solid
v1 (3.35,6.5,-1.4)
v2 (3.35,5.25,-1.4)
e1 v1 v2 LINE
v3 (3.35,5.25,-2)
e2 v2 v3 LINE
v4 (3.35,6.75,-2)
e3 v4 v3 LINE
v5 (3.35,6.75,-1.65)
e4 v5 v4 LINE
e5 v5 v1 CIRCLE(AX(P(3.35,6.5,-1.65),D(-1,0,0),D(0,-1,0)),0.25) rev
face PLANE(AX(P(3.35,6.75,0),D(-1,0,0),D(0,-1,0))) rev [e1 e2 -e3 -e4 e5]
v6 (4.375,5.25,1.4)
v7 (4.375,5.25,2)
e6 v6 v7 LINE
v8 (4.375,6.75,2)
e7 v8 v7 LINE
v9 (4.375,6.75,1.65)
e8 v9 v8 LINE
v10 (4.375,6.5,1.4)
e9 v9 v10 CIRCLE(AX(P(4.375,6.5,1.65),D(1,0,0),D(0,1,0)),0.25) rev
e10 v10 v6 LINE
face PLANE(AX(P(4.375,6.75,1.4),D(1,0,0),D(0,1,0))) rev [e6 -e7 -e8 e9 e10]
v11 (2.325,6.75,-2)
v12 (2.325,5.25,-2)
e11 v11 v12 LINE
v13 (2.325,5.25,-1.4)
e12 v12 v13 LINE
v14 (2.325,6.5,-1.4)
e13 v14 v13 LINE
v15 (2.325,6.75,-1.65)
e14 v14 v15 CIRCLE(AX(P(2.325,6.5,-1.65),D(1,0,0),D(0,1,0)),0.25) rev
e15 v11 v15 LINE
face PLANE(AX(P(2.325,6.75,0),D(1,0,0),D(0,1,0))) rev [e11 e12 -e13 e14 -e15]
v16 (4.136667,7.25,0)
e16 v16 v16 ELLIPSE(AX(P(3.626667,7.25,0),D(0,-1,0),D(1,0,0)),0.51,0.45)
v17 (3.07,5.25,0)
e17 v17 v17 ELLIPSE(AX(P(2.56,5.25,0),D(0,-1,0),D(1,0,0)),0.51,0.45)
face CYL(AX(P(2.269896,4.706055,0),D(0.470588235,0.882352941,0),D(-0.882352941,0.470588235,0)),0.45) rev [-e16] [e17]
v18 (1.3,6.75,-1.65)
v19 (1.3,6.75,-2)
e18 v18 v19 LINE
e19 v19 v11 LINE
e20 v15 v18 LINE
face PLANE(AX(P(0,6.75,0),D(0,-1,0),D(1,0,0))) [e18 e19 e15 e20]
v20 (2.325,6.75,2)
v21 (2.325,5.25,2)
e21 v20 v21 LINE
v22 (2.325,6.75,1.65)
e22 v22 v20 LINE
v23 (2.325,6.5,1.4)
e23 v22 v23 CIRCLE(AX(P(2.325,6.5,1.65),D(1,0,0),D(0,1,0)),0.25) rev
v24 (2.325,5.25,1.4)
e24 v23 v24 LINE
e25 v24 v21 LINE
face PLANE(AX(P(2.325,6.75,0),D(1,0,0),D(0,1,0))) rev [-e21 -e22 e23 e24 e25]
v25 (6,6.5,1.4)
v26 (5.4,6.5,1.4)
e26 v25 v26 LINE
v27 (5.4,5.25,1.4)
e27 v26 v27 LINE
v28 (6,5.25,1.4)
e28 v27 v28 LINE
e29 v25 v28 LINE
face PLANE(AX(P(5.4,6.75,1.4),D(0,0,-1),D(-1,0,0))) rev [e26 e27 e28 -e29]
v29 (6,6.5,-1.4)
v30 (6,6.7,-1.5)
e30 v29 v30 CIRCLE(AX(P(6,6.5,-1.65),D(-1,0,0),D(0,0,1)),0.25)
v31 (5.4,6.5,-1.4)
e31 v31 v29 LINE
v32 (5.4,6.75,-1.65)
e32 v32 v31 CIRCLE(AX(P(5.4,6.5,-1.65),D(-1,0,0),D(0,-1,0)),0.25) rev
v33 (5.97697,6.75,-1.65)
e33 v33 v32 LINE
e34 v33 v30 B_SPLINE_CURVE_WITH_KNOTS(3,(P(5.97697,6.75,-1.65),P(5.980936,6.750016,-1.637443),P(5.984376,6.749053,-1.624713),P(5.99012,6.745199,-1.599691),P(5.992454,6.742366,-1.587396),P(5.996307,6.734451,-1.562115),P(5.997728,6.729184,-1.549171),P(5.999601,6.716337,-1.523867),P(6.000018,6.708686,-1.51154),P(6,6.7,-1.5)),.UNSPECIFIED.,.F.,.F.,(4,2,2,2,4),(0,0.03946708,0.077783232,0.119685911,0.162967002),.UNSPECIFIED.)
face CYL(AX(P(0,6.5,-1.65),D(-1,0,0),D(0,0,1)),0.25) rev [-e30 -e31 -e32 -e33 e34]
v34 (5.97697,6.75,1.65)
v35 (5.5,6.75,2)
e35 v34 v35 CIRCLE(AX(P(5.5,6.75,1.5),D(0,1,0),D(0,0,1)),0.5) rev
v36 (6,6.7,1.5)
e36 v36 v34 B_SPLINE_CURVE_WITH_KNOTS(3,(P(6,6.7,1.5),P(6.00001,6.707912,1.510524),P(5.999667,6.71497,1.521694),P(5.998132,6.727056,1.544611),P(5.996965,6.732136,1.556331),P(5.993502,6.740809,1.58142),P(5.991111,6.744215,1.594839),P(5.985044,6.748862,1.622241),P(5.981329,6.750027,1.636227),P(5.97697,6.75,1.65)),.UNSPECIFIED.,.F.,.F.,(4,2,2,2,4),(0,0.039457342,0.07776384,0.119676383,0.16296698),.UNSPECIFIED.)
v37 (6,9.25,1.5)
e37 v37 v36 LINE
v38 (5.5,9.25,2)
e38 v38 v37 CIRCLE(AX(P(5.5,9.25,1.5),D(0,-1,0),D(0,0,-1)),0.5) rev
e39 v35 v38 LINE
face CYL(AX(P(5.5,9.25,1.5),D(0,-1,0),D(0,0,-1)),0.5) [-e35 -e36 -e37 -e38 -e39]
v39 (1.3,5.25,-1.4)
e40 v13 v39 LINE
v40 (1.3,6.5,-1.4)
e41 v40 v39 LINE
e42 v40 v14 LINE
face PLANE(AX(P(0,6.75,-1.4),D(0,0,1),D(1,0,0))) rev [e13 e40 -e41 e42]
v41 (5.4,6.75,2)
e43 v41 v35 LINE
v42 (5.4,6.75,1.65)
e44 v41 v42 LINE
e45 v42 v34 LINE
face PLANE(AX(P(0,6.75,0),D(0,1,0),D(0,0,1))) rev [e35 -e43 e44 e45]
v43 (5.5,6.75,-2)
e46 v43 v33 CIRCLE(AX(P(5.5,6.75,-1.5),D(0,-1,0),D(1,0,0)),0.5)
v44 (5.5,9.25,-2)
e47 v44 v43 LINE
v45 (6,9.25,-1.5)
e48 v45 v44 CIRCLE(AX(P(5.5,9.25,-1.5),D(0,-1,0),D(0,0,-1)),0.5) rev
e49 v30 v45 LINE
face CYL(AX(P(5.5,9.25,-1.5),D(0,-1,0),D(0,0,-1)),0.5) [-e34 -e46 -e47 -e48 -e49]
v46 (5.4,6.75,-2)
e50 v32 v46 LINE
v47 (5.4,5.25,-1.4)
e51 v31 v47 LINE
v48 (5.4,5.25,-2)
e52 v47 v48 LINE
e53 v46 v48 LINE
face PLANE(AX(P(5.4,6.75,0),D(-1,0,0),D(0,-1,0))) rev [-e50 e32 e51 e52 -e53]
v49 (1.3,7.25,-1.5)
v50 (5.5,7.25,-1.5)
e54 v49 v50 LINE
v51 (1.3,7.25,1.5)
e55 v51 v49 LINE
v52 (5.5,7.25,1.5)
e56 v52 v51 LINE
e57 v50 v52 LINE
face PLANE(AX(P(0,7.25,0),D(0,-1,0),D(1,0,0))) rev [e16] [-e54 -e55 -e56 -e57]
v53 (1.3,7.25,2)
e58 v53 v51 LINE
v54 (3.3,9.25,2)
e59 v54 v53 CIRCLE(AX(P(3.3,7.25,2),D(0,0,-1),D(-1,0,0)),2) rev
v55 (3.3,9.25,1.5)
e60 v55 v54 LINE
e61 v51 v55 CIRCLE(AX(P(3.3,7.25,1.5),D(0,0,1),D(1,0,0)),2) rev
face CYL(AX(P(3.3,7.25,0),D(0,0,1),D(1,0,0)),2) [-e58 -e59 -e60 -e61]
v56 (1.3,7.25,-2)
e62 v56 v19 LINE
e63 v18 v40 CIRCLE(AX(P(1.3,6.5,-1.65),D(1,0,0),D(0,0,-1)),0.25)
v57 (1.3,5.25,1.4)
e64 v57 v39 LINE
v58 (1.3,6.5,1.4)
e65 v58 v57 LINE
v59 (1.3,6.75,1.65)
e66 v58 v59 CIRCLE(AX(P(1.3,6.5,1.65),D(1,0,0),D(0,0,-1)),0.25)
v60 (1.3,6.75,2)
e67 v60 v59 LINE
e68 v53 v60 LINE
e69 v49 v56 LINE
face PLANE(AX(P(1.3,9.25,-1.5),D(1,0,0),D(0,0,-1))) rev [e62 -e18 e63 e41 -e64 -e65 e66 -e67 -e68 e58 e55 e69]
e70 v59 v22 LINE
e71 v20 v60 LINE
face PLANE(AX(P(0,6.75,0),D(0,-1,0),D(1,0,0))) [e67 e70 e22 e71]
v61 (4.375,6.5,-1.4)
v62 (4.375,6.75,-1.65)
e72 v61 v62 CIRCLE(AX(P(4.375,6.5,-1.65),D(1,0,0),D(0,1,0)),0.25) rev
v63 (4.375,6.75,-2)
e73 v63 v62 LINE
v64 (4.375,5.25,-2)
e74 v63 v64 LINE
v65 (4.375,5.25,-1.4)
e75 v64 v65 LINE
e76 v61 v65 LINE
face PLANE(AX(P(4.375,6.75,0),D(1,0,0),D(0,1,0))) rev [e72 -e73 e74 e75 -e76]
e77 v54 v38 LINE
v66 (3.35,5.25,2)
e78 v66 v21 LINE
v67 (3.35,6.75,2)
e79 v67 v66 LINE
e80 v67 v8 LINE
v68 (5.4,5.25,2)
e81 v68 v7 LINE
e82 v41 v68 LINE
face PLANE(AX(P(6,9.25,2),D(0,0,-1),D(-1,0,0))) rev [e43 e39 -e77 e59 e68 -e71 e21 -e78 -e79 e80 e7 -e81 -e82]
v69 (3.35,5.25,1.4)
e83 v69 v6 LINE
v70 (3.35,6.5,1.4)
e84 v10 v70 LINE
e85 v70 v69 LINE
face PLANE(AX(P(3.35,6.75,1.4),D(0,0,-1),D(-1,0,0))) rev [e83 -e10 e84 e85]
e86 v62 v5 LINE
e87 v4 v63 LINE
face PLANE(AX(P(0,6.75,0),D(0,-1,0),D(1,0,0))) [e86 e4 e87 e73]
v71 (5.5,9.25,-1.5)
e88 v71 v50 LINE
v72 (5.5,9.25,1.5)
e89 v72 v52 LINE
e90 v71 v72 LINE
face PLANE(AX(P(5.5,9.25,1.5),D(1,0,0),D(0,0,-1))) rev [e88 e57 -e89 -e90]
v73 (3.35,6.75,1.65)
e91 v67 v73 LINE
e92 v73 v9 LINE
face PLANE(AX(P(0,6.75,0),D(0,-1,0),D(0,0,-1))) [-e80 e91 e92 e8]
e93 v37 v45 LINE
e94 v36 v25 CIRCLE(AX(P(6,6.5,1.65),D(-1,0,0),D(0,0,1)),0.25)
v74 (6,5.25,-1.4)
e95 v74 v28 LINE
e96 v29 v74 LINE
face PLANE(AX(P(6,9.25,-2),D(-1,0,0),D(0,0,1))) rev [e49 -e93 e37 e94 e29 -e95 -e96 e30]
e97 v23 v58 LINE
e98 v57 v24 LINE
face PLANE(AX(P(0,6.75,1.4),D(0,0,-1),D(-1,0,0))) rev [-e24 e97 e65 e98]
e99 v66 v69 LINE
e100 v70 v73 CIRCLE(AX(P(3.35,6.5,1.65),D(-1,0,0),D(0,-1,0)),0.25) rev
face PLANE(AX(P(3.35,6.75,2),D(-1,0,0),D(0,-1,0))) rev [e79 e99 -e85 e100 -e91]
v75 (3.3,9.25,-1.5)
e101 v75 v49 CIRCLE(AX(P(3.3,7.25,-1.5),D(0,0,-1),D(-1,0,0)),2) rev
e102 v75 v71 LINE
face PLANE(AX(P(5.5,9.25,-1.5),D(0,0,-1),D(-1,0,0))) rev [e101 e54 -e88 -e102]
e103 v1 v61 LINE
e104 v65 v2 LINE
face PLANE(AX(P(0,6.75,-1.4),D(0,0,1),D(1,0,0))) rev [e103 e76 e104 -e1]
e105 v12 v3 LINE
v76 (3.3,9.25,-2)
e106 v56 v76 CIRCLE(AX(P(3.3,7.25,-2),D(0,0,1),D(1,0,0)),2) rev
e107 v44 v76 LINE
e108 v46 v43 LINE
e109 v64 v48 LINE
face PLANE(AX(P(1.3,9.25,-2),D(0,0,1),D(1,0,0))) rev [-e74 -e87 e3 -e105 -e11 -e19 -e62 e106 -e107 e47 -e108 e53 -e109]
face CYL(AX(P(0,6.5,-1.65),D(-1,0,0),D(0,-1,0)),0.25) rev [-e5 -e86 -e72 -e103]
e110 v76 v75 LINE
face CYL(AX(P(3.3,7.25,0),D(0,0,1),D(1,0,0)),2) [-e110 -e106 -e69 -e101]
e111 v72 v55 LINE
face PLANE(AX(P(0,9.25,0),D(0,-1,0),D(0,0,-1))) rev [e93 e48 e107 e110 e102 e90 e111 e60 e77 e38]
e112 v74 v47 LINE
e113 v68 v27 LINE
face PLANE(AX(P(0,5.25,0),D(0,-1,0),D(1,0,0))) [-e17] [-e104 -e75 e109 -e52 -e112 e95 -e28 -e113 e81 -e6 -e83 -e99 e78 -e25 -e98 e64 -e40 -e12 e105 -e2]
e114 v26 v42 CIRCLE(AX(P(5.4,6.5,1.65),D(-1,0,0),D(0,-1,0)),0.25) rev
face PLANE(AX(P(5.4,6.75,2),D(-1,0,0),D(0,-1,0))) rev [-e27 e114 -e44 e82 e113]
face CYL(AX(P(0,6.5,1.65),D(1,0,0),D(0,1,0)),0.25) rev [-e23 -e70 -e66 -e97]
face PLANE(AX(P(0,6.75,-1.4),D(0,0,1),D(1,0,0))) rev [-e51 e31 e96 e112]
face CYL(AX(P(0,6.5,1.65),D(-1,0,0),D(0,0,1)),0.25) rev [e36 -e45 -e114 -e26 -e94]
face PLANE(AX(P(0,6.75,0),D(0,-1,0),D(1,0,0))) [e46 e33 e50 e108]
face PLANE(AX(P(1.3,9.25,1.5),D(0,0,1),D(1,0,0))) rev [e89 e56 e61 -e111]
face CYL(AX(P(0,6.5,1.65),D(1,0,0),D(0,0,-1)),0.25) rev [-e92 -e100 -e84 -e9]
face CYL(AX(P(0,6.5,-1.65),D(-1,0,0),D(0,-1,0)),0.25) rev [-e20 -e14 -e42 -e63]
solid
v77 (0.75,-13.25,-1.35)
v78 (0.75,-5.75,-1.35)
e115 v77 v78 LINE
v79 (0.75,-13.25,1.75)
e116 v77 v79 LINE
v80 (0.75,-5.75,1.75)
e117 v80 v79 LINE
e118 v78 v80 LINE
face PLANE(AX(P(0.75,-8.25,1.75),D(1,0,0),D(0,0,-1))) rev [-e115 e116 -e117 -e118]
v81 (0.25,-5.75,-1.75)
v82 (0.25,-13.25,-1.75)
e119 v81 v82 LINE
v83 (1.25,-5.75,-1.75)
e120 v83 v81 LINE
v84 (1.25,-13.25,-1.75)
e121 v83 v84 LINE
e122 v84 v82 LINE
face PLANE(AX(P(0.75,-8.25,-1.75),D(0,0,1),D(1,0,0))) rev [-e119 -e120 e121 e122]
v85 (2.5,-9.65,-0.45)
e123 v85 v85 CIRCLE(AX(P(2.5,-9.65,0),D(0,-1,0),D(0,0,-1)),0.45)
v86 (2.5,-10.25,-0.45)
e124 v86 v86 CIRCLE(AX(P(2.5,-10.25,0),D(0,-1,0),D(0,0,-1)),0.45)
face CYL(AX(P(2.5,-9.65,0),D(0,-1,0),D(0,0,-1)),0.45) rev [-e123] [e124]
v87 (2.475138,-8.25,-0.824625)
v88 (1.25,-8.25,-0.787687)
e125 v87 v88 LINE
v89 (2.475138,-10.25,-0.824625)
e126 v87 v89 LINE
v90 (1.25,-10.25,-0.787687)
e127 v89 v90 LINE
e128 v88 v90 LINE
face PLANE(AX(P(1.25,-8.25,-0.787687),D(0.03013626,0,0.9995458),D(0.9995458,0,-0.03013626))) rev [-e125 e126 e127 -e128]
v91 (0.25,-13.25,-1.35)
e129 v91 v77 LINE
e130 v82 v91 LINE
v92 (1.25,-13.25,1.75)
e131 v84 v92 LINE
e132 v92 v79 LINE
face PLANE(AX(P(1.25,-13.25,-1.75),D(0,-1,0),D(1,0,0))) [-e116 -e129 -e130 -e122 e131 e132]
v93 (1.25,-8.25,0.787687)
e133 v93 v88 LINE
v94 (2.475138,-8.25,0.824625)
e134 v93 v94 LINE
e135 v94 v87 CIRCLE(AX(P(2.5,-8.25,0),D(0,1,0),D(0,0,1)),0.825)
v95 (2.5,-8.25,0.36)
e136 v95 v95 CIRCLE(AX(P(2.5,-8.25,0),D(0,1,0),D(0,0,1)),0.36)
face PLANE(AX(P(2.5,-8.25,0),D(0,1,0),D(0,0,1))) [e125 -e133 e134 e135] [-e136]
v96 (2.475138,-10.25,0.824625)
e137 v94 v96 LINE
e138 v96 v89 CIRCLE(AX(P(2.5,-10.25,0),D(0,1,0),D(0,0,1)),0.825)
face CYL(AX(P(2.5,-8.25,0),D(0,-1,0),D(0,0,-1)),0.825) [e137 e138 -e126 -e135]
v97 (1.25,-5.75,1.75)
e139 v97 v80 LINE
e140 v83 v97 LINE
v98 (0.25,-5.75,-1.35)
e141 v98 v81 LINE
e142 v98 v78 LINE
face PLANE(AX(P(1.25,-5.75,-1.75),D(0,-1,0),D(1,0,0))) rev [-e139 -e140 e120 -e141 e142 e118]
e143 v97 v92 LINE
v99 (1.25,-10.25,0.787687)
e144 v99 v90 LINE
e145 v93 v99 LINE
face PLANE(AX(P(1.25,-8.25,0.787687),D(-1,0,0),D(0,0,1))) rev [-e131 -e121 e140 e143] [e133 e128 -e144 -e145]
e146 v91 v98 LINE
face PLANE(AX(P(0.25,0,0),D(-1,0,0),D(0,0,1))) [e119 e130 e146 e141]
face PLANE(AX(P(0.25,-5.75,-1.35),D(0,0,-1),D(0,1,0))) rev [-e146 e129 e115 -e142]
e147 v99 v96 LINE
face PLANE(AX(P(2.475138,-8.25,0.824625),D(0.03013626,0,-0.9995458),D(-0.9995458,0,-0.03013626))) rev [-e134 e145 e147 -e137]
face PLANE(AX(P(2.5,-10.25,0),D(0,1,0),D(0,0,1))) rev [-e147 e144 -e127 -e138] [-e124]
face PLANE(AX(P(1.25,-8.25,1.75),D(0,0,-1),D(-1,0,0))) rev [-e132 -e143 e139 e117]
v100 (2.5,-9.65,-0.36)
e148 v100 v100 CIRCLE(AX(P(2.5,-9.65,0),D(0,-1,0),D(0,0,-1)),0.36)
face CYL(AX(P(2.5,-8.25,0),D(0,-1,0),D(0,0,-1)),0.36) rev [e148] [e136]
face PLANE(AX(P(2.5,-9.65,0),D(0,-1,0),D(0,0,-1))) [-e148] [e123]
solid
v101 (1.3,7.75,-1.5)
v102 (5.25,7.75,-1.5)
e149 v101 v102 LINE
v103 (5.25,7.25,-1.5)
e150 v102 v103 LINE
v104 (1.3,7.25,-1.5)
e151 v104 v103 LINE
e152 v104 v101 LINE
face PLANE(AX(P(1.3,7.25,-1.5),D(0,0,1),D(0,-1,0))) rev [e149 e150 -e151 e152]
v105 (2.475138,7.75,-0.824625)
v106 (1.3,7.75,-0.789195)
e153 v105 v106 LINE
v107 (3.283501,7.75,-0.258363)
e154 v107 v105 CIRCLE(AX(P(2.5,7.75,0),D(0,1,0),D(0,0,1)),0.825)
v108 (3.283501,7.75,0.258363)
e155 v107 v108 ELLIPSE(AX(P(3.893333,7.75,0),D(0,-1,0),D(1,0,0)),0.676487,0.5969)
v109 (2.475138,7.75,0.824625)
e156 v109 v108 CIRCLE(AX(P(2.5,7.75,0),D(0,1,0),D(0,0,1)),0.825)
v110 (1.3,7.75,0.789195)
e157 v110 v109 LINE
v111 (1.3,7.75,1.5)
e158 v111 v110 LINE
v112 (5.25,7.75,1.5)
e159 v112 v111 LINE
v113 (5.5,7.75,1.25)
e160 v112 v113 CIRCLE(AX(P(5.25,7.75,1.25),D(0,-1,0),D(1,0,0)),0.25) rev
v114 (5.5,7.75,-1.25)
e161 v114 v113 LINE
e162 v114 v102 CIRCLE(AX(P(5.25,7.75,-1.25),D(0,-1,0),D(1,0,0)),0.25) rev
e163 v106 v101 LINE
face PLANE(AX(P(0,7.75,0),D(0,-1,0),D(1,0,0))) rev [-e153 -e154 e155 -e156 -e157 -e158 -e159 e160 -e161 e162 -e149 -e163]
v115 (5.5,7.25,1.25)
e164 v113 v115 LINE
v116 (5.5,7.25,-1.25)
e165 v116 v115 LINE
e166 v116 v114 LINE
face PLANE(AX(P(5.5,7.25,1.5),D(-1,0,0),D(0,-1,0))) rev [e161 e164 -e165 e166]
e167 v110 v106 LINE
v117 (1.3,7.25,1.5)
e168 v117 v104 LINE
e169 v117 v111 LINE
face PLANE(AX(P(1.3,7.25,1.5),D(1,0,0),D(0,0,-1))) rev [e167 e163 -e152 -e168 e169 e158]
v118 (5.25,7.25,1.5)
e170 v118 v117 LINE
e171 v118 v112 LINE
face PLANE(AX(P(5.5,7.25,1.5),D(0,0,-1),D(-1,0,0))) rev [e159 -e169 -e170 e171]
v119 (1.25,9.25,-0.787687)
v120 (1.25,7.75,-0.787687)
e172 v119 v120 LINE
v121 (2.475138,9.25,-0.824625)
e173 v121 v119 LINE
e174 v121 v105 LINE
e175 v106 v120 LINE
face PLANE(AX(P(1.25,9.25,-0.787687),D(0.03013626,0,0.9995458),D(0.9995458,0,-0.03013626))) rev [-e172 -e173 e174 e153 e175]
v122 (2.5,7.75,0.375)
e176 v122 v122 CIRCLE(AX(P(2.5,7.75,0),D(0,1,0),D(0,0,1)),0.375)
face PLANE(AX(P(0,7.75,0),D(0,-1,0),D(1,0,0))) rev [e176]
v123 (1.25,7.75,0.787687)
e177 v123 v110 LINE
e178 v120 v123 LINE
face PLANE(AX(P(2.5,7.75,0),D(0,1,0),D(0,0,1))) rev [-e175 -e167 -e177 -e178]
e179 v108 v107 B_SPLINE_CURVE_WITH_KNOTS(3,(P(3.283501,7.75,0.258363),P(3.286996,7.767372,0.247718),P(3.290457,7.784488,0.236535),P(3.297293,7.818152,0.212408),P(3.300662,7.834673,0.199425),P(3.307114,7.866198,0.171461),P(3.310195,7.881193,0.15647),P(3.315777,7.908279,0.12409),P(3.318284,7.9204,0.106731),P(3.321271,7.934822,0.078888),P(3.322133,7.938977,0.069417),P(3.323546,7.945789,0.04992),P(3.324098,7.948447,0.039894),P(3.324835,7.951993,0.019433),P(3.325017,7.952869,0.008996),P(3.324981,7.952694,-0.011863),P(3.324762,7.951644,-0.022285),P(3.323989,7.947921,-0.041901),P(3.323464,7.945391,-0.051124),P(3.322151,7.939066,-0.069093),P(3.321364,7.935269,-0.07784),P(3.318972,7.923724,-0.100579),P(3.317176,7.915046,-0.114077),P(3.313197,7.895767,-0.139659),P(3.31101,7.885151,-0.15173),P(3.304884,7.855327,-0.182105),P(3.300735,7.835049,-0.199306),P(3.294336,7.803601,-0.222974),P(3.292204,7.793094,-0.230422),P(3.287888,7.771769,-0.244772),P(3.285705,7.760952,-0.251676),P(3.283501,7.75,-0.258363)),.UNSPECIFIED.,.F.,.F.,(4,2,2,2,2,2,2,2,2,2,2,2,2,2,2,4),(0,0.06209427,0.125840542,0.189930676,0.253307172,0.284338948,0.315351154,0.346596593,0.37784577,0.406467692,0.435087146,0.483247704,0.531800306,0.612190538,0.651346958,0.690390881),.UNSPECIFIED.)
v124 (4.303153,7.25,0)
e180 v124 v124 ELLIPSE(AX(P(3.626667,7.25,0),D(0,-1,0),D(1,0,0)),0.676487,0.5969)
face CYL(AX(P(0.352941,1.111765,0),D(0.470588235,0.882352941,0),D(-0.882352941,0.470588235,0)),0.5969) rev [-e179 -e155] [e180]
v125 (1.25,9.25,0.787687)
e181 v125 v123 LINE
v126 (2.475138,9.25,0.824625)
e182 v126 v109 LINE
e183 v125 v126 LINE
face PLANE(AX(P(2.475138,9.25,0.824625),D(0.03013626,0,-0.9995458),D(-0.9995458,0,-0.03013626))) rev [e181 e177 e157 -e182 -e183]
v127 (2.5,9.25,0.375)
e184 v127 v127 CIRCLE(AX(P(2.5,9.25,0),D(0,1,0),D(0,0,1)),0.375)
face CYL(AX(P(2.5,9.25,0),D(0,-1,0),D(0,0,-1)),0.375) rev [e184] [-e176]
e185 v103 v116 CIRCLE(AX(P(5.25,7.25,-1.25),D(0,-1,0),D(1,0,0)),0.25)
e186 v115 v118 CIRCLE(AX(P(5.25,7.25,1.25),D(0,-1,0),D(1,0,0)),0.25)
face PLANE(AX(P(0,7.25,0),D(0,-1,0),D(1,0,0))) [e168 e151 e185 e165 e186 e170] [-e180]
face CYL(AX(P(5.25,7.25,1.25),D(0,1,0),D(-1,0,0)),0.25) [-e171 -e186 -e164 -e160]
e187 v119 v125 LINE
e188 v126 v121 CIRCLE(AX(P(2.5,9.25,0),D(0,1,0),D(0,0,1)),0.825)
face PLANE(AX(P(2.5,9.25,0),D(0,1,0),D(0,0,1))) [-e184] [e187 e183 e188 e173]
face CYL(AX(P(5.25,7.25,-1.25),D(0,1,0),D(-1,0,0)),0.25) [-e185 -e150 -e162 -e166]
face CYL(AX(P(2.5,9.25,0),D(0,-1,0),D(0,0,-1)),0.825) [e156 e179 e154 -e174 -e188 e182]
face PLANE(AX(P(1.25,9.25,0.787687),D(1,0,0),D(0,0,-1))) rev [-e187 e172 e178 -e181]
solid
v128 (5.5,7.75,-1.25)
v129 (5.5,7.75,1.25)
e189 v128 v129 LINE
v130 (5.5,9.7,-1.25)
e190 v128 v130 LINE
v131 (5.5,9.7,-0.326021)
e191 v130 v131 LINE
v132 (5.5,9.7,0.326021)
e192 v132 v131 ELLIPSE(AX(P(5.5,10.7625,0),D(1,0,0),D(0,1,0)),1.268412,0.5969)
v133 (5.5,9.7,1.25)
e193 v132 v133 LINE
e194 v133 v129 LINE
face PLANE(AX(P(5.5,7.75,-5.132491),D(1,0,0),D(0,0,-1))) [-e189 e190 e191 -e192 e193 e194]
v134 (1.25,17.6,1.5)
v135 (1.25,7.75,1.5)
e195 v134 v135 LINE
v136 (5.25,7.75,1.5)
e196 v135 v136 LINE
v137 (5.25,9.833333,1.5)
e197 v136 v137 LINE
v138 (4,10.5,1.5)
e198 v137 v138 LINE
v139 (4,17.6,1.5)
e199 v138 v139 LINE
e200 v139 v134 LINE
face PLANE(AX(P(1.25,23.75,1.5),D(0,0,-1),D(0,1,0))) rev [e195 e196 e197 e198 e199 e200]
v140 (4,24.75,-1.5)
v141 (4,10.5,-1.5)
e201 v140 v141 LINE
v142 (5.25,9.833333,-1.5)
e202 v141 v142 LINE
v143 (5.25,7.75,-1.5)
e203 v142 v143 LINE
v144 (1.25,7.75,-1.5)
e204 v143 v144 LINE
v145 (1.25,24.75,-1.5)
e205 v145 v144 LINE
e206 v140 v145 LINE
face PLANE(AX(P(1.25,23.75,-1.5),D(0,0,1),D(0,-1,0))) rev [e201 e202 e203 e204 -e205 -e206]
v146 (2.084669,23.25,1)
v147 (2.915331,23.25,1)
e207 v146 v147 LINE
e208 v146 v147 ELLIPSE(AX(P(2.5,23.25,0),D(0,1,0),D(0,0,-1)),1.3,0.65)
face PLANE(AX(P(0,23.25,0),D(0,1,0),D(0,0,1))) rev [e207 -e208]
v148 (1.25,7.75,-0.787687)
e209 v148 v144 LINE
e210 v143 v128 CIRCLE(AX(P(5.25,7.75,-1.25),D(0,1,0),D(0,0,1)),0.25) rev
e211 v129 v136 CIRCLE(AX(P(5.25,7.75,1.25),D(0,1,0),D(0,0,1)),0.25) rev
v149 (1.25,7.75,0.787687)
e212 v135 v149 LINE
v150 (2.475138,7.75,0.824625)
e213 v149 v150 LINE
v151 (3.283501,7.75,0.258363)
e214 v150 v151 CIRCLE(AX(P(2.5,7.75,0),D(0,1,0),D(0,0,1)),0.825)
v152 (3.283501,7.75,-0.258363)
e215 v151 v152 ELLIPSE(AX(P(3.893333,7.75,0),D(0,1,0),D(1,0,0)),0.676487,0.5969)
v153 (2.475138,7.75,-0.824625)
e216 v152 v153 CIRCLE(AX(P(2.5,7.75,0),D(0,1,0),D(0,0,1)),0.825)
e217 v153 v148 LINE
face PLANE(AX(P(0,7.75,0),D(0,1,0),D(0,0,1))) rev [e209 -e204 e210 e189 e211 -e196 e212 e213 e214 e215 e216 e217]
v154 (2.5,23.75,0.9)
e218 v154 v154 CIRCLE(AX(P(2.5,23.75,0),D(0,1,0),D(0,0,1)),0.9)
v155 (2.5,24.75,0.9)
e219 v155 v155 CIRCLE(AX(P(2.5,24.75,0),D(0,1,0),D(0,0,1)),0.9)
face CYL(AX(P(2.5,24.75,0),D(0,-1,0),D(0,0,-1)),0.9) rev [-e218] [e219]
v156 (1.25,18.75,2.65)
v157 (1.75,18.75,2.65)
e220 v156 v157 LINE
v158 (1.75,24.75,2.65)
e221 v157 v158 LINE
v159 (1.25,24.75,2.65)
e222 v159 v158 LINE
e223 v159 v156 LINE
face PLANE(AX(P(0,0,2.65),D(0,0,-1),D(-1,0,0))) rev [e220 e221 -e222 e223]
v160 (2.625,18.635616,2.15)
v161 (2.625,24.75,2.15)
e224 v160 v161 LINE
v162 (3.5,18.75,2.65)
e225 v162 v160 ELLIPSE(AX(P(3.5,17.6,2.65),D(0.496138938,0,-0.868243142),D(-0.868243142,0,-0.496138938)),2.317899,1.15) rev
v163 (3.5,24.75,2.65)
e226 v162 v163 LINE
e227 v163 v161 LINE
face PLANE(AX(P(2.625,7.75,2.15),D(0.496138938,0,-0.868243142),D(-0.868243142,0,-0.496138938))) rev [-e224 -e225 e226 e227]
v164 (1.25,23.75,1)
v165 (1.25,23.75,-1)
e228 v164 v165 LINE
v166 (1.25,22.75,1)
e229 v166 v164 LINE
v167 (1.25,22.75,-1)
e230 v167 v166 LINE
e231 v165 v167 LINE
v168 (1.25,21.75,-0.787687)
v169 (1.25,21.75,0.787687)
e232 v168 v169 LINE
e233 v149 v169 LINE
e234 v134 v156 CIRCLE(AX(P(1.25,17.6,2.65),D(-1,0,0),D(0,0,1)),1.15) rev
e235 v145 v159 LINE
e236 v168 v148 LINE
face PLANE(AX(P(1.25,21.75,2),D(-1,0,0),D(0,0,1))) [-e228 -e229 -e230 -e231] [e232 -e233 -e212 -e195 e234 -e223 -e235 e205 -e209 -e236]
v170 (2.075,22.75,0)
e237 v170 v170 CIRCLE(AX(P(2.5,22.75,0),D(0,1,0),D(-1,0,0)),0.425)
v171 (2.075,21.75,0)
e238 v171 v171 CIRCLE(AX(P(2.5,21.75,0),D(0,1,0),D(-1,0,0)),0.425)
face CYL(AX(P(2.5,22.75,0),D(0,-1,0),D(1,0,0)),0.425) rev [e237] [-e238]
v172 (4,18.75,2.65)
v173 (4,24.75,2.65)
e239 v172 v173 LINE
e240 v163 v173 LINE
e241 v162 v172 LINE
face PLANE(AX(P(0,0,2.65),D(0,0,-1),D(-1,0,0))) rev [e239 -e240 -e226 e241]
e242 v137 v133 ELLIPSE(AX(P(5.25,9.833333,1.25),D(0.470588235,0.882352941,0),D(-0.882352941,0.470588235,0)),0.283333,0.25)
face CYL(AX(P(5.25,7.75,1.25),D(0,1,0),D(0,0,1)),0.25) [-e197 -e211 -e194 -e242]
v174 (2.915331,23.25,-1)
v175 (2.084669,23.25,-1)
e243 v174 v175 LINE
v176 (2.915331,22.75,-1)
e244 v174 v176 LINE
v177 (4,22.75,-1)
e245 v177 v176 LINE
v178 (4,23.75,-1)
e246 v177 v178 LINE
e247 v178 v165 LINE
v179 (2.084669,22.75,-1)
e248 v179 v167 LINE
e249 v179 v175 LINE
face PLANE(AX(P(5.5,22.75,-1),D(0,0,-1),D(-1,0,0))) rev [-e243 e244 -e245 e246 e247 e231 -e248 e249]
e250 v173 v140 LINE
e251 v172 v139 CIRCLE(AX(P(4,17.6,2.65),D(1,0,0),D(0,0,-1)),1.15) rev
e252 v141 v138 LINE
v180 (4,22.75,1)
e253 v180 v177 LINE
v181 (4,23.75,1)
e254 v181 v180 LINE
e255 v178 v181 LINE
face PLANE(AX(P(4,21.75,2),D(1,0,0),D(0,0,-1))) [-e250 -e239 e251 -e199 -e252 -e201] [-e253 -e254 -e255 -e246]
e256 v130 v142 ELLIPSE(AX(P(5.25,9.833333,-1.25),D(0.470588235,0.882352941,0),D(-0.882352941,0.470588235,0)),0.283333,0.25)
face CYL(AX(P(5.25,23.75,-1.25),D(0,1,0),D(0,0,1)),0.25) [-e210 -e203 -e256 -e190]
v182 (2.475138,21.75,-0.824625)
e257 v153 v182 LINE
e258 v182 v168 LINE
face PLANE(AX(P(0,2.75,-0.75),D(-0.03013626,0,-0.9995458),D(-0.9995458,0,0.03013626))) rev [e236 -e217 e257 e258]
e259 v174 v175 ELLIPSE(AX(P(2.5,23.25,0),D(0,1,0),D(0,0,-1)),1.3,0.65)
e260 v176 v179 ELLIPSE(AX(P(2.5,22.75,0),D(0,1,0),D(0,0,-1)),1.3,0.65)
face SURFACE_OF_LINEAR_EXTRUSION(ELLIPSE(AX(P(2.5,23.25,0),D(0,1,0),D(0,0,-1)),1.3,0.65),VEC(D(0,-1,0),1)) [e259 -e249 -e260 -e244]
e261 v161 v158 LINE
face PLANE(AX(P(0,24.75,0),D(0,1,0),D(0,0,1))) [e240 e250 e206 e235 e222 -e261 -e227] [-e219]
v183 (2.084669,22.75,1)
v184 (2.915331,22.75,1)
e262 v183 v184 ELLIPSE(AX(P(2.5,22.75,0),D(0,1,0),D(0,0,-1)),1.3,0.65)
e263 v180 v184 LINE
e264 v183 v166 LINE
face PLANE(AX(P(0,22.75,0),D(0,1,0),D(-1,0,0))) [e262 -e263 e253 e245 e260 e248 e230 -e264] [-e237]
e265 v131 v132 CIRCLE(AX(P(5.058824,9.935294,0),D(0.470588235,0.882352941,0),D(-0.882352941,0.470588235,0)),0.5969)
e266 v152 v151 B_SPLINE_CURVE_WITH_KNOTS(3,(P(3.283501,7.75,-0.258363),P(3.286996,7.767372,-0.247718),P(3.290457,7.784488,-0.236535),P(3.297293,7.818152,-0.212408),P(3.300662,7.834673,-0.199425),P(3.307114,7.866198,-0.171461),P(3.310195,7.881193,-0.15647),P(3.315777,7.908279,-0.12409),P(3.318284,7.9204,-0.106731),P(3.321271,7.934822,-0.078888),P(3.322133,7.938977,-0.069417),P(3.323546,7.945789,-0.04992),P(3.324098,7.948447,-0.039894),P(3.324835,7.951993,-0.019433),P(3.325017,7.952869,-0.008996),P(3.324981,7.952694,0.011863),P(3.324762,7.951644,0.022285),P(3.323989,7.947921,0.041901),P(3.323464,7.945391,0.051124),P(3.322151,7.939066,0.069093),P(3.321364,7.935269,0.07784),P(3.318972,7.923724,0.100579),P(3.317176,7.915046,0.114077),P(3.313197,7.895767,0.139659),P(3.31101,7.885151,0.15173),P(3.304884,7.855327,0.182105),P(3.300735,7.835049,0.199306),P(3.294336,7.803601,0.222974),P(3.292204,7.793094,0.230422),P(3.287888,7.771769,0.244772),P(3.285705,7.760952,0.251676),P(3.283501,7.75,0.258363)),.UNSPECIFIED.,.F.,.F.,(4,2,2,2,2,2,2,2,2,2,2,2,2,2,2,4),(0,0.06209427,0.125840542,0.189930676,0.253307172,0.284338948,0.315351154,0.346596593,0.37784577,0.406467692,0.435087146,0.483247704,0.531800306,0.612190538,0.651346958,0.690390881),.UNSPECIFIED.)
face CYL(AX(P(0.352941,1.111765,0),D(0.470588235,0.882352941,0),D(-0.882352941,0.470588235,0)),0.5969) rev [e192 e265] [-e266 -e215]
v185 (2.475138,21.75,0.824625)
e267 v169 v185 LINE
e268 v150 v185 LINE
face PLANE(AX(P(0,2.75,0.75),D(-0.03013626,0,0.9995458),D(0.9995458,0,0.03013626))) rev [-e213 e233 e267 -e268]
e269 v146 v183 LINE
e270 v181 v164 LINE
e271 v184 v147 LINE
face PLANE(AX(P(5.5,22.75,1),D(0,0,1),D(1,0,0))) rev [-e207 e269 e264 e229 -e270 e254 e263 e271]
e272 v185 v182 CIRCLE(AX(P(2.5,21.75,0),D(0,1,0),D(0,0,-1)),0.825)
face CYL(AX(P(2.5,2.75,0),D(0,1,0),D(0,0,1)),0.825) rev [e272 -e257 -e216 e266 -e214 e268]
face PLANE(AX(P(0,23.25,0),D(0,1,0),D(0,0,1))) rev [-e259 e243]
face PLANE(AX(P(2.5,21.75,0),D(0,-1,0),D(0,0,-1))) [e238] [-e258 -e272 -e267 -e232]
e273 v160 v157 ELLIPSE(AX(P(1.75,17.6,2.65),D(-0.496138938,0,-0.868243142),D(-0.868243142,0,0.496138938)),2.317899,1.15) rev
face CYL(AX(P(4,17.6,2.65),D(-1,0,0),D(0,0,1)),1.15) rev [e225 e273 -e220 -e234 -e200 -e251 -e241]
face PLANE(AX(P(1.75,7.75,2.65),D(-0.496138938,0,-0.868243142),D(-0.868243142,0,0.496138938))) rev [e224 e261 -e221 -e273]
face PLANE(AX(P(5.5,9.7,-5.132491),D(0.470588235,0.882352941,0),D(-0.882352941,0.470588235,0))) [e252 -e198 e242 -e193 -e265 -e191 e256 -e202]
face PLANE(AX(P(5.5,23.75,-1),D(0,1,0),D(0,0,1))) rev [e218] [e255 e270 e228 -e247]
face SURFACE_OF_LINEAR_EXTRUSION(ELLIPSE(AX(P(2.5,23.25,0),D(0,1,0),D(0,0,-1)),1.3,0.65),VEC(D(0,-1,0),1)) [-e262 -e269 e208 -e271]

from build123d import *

# Parameters (mm, degrees)
SHUTTLECHANNELOUTLINE_W                = 2.75
SHUTTLECHANNELOUTLINE_H                = 4
SHUTTLECHANNELBODY_EXTRUDE_DEPTH       = 14
SKETCH23_R                             = 0.425
SHUTTLECHANNELCAP_EXTRUDE1_DEPTH       = 1
SKETCH22_RX                            = 1.3
SKETCH22_RY                            = 0.65
SHUTTLECHANNELCAP_EXTRUDE2_DEPTH       = 0.5
SKETCH24_R                             = 0.65
SHUTTLECHANNELCAP_EXTRUDE3_DEPTH       = 0.5
SKETCH26_R                             = 0.25
SHUTTLECHANNELCAP_INJECTIONHOLE_DEPTH  = 24.992186228
CHANNEL_CUT_EXTRUDE12_DEPTH            = 14
CHANNEL_CUT_EXTRUDE12_DEPTH_BACK       = 5
BOSS_EXTRUDE1_DEPTH                    = 4
SKETCH31_W                             = 4.25
SKETCH31_H                             = 0.5
CUT_EXTRUDE3_DEPTH                     = 18.036725037
SKETCH29_W                             = 2.75
SKETCH29_H                             = 5
BOSS_EXTRUDE2_DEPTH                    = 1.15
SKETCH49_W                             = 2.75
SKETCH49_H                             = 4.15
SKETCH49_R                             = 0.9
BOSS_EXTRUDE10_DEPTH                   = 1
FILLET2_R                              = 1.15
SKETCH51_W                             = 2
SKETCH51_H                             = 1
CUT_EXTRUDE8_DEPTH                     = 26.251683112
CUT_EXTRUDE9_DEPTH                     = 19.063014699
SKETCH37_R                             = 0.375
SHUTTLEPLUG_DEPTH                      = 1.5
SKETCH38_W                             = 4.2
SKETCH38_H                             = 3
BOSS_EXTRUDE7_DEPTH                    = 0.5
BOSS_EXTRUDE8_DEPTH                    = 4
BOSS_EXTRUDE8_START                    = -1
BOSS_EXTRUDE8_2_DEPTH                  = 2
BOSS_EXTRUDE8_3_DEPTH                  = 2
SKETCH41_W                             = 4.7
SKETCH41_H                             = 4
BOSS_EXTRUDE9_DEPTH                    = 2
SKETCH42_W                             = 1.025
SKETCH42_H                             = 0.6
SKETCH42_W_2                           = 0.6
CUT_EXTRUDE6_DEPTH                     = 1.5
MOUNTINGSCREWTHREADINGHOLE_START       = -3.720588235
MOUNTINGSCREWTHREADINGHOLE_OUTLINE_R   = 0.45
MOUNTINGSCREWTHREADINGHOLE_DEPTH       = 3.720588235
MOUNTINGSCREWTHREADINGHOLE_START_2     = -3.697058824
MOUNTINGSCREWTHREADINGHOLE_2_OUTLINE_R = 0.45
MOUNTINGSCREWTHREADINGHOLE_2_DEPTH     = 1.460392257
MOUNTINGSCREWTHREADINGHOLE_START_3     = 1.3
MOUNTINGSCREWTHREADINGHOLE_3_DEPTH     = 4.7
MOUNTINGSCREWTHREADINGHOLE_START_4     = -2
MOUNTINGSCREWTHREADINGHOLE_4_DEPTH     = 4
MOUNTINGSCREWTHREADINGHOLE_START_5     = 5.25
MOUNTINGSCREWTHREADINGHOLE_5_DEPTH     = 4
MOUNTINGSCREWTHREADINGHOLE_START_6     = 5.244117647
MOUNTINGSCREWTHREADINGHOLE_6_OUTLINE_R = 0.45
MOUNTINGSCREWTHREADINGHOLE_6_DEPTH     = 3.741176471
SKETCH47_R                             = 0.5969
MOUNTINGSCREWTHROUGHHOLE_DEPTH         = 10
SKETCH32_R                             = 0.36
SHUTTLESLIDERFORTHREADING_DEPTH        = 2
SKETCH33_W                             = 3.5
SKETCH33_H                             = 7.5
SHUTTLEBODY_DEPTH                      = 0.5
SKETCH34_W                             = 0.4
SKETCH34_H                             = 7.5
ALIGNMENTRIDGE_DEPTH                   = 0.5
SKETCH50_R                             = 0.45
CUT_EXTRUDE7_DEPTH                     = 0.6


with BuildPart() as part:
    # ShuttleChannelOutline → ShuttleChannelBody-Extrude (new body)
    with BuildSketch(Plane(origin=(34.00679446, 7.75, 0), x_dir=(-1, 0, 0), z_dir=(0, -1, 0))):
        with Locations((31.38179446, 0)):
            Rectangle(SHUTTLECHANNELOUTLINE_W, SHUTTLECHANNELOUTLINE_H)
    extrude(amount=-SHUTTLECHANNELBODY_EXTRUDE_DEPTH)

    # Sketch23 → ShuttleChannelCap-Extrude1 (add)
    with BuildSketch(Plane(origin=(0, 21.75, 0), x_dir=(0.9959459421984984, 0, -0.08995376711592049), z_dir=(0, 1, 0))):
        Polygon((3.803876235, -2.351706953), (4.163691303, 1.632076816), (1.424839962, 1.879449675), (1.065024894, -2.104334093), align=None)
        with Locations(Location((2.489864855, -0.224884418, 0), (0, 0, 174.839052647))):
            Circle(SKETCH23_R, mode=Mode.SUBTRACT)
    extrude(amount=SHUTTLECHANNELCAP_EXTRUDE1_DEPTH)

    # Sketch22 → ShuttleChannelCap-Extrude2 (add)
    with BuildSketch(Plane(origin=(0, 22.75, 0), x_dir=(0.9908592743397946, 0, -0.13489958656280454), z_dir=(0, 1, 0))):
        Polygon((3.693637924, -2.521316895), (0.96877492, -2.150343032), (1.508373266, 1.813094065), (4.23323627, 1.442120202), align=None)
        with Locations(Location((2.477148186, -0.337248966), (0, 0, 82.247186492))):
            Ellipse(SKETCH22_RX, SKETCH22_RY, mode=Mode.SUBTRACT)
    extrude(amount=SHUTTLECHANNELCAP_EXTRUDE2_DEPTH)

    # Sketch24 → ShuttleChannelCap-Extrude3 (add)
    with BuildSketch(Plane(origin=(0, 23.25, 0), x_dir=(0.9908592743397946, 0, -0.13489958656280476), z_dir=(0, 1, 0))):
        Polygon((3.693637924, -2.521316895), (4.23323627, 1.442120202), (1.508373266, 1.813094066), (0.96877492, -2.150343032), align=None)
        with Locations(Location((2.477148186, -0.337248966, 0), (0, 0, 172.247186492))):
            Circle(SKETCH24_R, mode=Mode.SUBTRACT)
    extrude(amount=SHUTTLECHANNELCAP_EXTRUDE3_DEPTH)

    # Sketch26 → ShuttleChannelCap-InjectionHole (cut, through all)
    with BuildSketch(Plane(origin=(4, 0, 0), x_dir=(0, -0.8752022423708544, -0.4837572066119824), z_dir=(-1, 0, 0))):
        with Locations(Location((-20.129651575, -11.126415752, 0), (0, 0, 208.931080014))):
            Circle(SKETCH26_R)
    extrude(amount=SHUTTLECHANNELCAP_INJECTIONHOLE_DEPTH, mode=Mode.SUBTRACT)

    # ChannelOutline → Channel-Cut-Extrude12 (cut, two sides: drawn at the far end of the back side and taken through both)
    with BuildSketch(Plane(origin=(-34.00679446, 7.75, 0), x_dir=(1, 0, 0), z_dir=(0, 1, 0)).offset(-CHANNEL_CUT_EXTRUDE12_DEPTH_BACK)):
        with BuildLine():
            Line((34.00679446, 0.75), (34.00679446, -0.75))
            Line((34.00679446, -0.75), (36.481932046, -0.824625285))
            ThreePointArc((36.481932046, -0.824625285), (37.33179446, 0), (36.481932046, 0.824625285))
            Line((36.481932046, 0.824625285), (34.00679446, 0.75))
        make_face()
    extrude(amount=CHANNEL_CUT_EXTRUDE12_DEPTH + CHANNEL_CUT_EXTRUDE12_DEPTH_BACK, mode=Mode.SUBTRACT)

    # Sketch27 → Boss-Extrude1 (add)
    with BuildSketch(Plane.XY.offset(2)):
        Polygon((4, 7.75), (5.5, 7.75), (5.5, 9.7), (4, 10.5), align=None)
    extrude(amount=-BOSS_EXTRUDE1_DEPTH)

    # Sketch31 → Cut-Extrude3 (cut, through all)
    with BuildSketch(Plane.XZ.offset(-7.75)):
        with Locations((3.375, 1.75)):
            Rectangle(SKETCH31_W, SKETCH31_H)
        with Locations((3.375, -1.75)):
            Rectangle(SKETCH31_W, SKETCH31_H)
    extrude(amount=-CUT_EXTRUDE3_DEPTH, mode=Mode.SUBTRACT)

    # Sketch29 → Boss-Extrude2 (add)
    with BuildSketch(Plane.XY.offset(1.5)):
        with Locations((2.625, 21.25)):
            Rectangle(SKETCH29_W, SKETCH29_H)
    extrude(amount=BOSS_EXTRUDE2_DEPTH)

    # Sketch49 → Boss-Extrude10 (add)
    with BuildSketch(Plane(origin=(0, 23.75, 0), x_dir=(1, 0, 0), z_dir=(0, 1, 0))):
        with Locations((2.625, -0.575)):
            Rectangle(SKETCH49_W, SKETCH49_H)
        with Locations(Location((2.5, 0, 0), (0, 0, 270))):
            Circle(SKETCH49_R, mode=Mode.SUBTRACT)
    extrude(amount=BOSS_EXTRUDE10_DEPTH)

    # Fillet2
    fillet2_edges = [part.edges().sort_by_distance(p)[0] for p in [
        (2.625, 18.75, 1.5),
    ]]
    fillet(fillet2_edges, radius=FILLET2_R - 0.0001)  # a hair under: the kernel refuses the full size

    # Sketch51 → Cut-Extrude8 (cut, through all)
    with BuildSketch(Plane.ZY.offset(-1.25)):
        with Locations((0, 23.25)):
            Rectangle(SKETCH51_W, SKETCH51_H)
    extrude(amount=-CUT_EXTRUDE8_DEPTH, mode=Mode.SUBTRACT)

    # Sketch52 → Cut-Extrude9 (cut, through all)
    with BuildSketch(Plane(origin=(0, 24.75, 0), x_dir=(1, 0, 0), z_dir=(0, 1, 0))):
        Polygon((1.75, -2.65), (2.625, -2.15), (3.5, -2.65), (2.625, -2.65), align=None)
    extrude(amount=-CUT_EXTRUDE9_DEPTH, mode=Mode.SUBTRACT)

    # Boss-Extrude8: read off the stored shape, not the designer's step
    # Boss-Extrude8 outline → Boss-Extrude8 (cut)
    with BuildSketch(Plane(origin=(0, 7.25, 0), x_dir=(1, 0, 0), z_dir=(0, 1, 0))):
        with BuildLine():
            ThreePointArc((5.25, 1.5), (5.426776695, 1.426776695), (5.5, 1.25))
            Line((5.5, 1.25), (5.5, 1.5))
            Line((5.5, 1.5), (5.25, 1.5))
        make_face()
        with BuildLine():
            ThreePointArc((5.5, -1.25), (5.426776695, -1.426776695), (5.25, -1.5))
            Line((5.25, -1.5), (5.5, -1.5))
            Line((5.5, -1.5), (5.5, -1.25))
        make_face()
    extrude(amount=BOSS_EXTRUDE8_DEPTH, mode=Mode.SUBTRACT)

    # MountingScrewThreadingHole: read off the stored shape, not the designer's step
    # MountingScrewThreadingHole outline → MountingScrewThreadingHole (cut)
    with BuildSketch(Plane(origin=(5.24567474, 9.835640138, 0), x_dir=(0.8823529411764711, -0.470588235294117, 0), z_dir=(0.470588235294117, 0.8823529411764711, 0)).offset(MOUNTINGSCREWTHREADINGHOLE_START)):
        with Locations((-0.211764706, 0)):
            Circle(MOUNTINGSCREWTHREADINGHOLE_OUTLINE_R)
    extrude(amount=MOUNTINGSCREWTHREADINGHOLE_DEPTH, mode=Mode.SUBTRACT)


with BuildPart() as body_2:
    # Sketch37 → ShuttlePlug (new body)
    with BuildSketch(Plane(origin=(0, 7.75, 0), x_dir=(1, 0, 0), z_dir=(0, 1, 0))):
        with BuildLine():
            Line((2.475137585, -0.824625285), (1.25, -0.787687443))
            Line((1.25, -0.787687443), (1.25, 0.787687443))
            Line((1.25, 0.787687443), (2.475137585, 0.824625285))
            ThreePointArc((2.475137585, 0.824625285), (3.325, 0), (2.475137585, -0.824625285))
        make_face()
        with Locations(Location((2.5, 0, 0), (0, 0, 270))):
            Circle(SKETCH37_R, mode=Mode.SUBTRACT)
    extrude(amount=SHUTTLEPLUG_DEPTH)

    # Sketch38 → Boss-Extrude7 (add)
    with BuildSketch(Plane.XZ.offset(-7.75)):
        with Locations((3.4, 0)):
            Rectangle(SKETCH38_W, SKETCH38_H)
    extrude(amount=BOSS_EXTRUDE7_DEPTH)

    # Boss-Extrude8 2 outline → Boss-Extrude8 2 (cut)
    with BuildSketch(Plane(origin=(0, 7.25, 0), x_dir=(1, 0, 0), z_dir=(0, 1, 0)).offset(BOSS_EXTRUDE8_START)):
        with BuildLine():
            Line((5.5, -1.5), (5.5, -1.25))
            ThreePointArc((5.5, -1.25), (5.426776695, -1.426776695), (5.25, -1.5))
            Line((5.25, -1.5), (5.5, -1.5))
        make_face()
        with BuildLine():
            ThreePointArc((5.25, 1.5), (5.426776695, 1.426776695), (5.5, 1.25))
            Line((5.5, 1.25), (5.5, 1.5))
            Line((5.5, 1.5), (5.25, 1.5))
        make_face()
    extrude(amount=BOSS_EXTRUDE8_2_DEPTH, mode=Mode.SUBTRACT)

    # MountingScrewThreadingHole 2 outline → MountingScrewThreadingHole 2 (cut)
    with BuildSketch(Plane(origin=(5.24567474, 9.835640138, 0), x_dir=(0.8823529411764711, -0.470588235294117, 0), z_dir=(0.470588235294117, 0.8823529411764711, 0)).offset(MOUNTINGSCREWTHREADINGHOLE_START_2)):
        with Locations((-0.211764706, 0)):
            Circle(MOUNTINGSCREWTHREADINGHOLE_2_OUTLINE_R)
    extrude(amount=MOUNTINGSCREWTHREADINGHOLE_2_DEPTH, mode=Mode.SUBTRACT)


with BuildPart() as body_3:
    # Boss-Extrude8 3 outline → Boss-Extrude8 3 (new body)
    with BuildSketch(Plane(origin=(0, 7.25, 0), x_dir=(1, 0, 0), z_dir=(0, 1, 0))):
        Polygon((1.3, -1.5), (1.3, -2), (6, -2), (6, 2), (1.3, 2), (1.3, 1.5), (5.5, 1.5), (5.5, -1.5), align=None)
    extrude(amount=BOSS_EXTRUDE8_3_DEPTH)

    # Sketch41 → Boss-Extrude9 (add)
    with BuildSketch(Plane.XZ.offset(-7.25)):
        with Locations((3.65, 0)):
            Rectangle(SKETCH41_W, SKETCH41_H)
    extrude(amount=BOSS_EXTRUDE9_DEPTH)

    # Sketch42 → Cut-Extrude6 (cut)
    with BuildSketch(Plane.XZ.offset(-5.25)):
        with Locations((1.8125, 1.7)):
            Rectangle(SKETCH42_W, SKETCH42_H)
        with Locations((3.8625, -1.7)):
            Rectangle(SKETCH42_W, SKETCH42_H)
        with Locations((1.8125, -1.7)):
            Rectangle(SKETCH42_W, SKETCH42_H)
        with Locations((5.7, -1.7)):
            Rectangle(SKETCH42_W_2, SKETCH42_H)
        with Locations((3.8625, 1.7)):
            Rectangle(SKETCH42_W, SKETCH42_H)
        with Locations((5.7, 1.7)):
            Rectangle(SKETCH42_W_2, SKETCH42_H)
    extrude(amount=-CUT_EXTRUDE6_DEPTH, mode=Mode.SUBTRACT)

    # MountingScrewThreadingHole 3 outline → MountingScrewThreadingHole 3 (add)
    with BuildSketch(Plane.YZ.offset(MOUNTINGSCREWTHREADINGHOLE_START_3)):
        with BuildLine():
            ThreePointArc((6.75, 1.65), (6.676776695, 1.473223305), (6.5, 1.4))
            Line((6.5, 1.4), (6.75, 1.4))
            Line((6.75, 1.4), (6.75, 1.65))
        make_face()
        with BuildLine():
            Line((6.75, -1.4), (6.5, -1.4))
            ThreePointArc((6.5, -1.4), (6.676776695, -1.473223305), (6.75, -1.65))
            Line((6.75, -1.65), (6.75, -1.4))
        make_face()
    extrude(amount=MOUNTINGSCREWTHREADINGHOLE_3_DEPTH)

    # MountingScrewThreadingHole 4 outline → MountingScrewThreadingHole 4 (cut)
    with BuildSketch(Plane.XY.offset(MOUNTINGSCREWTHREADINGHOLE_START_4)):
        with BuildLine():
            ThreePointArc((1.3, 7.25), (1.885786438, 8.664213562), (3.3, 9.25))
            Line((3.3, 9.25), (1.3, 9.25))
            Line((1.3, 9.25), (1.3, 7.25))
        make_face()
    extrude(amount=MOUNTINGSCREWTHREADINGHOLE_4_DEPTH, mode=Mode.SUBTRACT)

    # MountingScrewThreadingHole 5 outline → MountingScrewThreadingHole 5 (cut)
    with BuildSketch(Plane(origin=(0, 0, 0), x_dir=(1, 0, 0), z_dir=(0, 1, 0)).offset(MOUNTINGSCREWTHREADINGHOLE_START_5)):
        with BuildLine():
            Line((6, -2), (6, -1.5))
            ThreePointArc((6, -1.5), (5.853553391, -1.853553391), (5.5, -2))
            Line((5.5, -2), (6, -2))
        make_face()
        with BuildLine():
            ThreePointArc((5.5, 2), (5.853553391, 1.853553391), (6, 1.5))
            Line((6, 1.5), (6, 2))
            Line((6, 2), (5.5, 2))
        make_face()
    extrude(amount=MOUNTINGSCREWTHREADINGHOLE_5_DEPTH, mode=Mode.SUBTRACT)

    # MountingScrewThreadingHole 6 outline → MountingScrewThreadingHole 6 (cut)
    with BuildSketch(Plane(origin=(0, 0, 0), x_dir=(0.882352941176471, -0.47058823529411703, 0), z_dir=(0.470588235294117, 0.882352941176471, 0)).offset(MOUNTINGSCREWTHREADINGHOLE_START_6)):
        with Locations((-0.211764706, 0)):
            Circle(MOUNTINGSCREWTHREADINGHOLE_6_OUTLINE_R)
    extrude(amount=MOUNTINGSCREWTHREADINGHOLE_6_DEPTH, mode=Mode.SUBTRACT)


with BuildPart() as mountingscrewthroughhole_tool:
    # Sketch47 → MountingScrewThroughHole (new body)
    with BuildSketch(Plane(origin=(5.24567474, 9.835640138, 0), x_dir=(0.882352941176471, -0.47058823529411686, 0), z_dir=(0.47058823529411686, 0.882352941176471, 0))):
        with Locations(Location((-0.211764706, 0, 0), (0, 0, 154.35198328))):
            Circle(SKETCH47_R)
    extrude(amount=-MOUNTINGSCREWTHROUGHHOLE_DEPTH)


with BuildPart() as part_1:
    add(part.part)

    # MountingScrewThroughHole: cut by mountingscrewthroughhole_tool
    add(mountingscrewthroughhole_tool.part, mode=Mode.SUBTRACT)


with BuildPart() as body_2_1:
    add(body_2.part)

    # MountingScrewThroughHole: cut by mountingscrewthroughhole_tool
    add(mountingscrewthroughhole_tool.part, mode=Mode.SUBTRACT)


with BuildPart() as body_4:
    # Sketch32 → ShuttleSliderForThreading (new body)
    with BuildSketch(Plane(origin=(0, -10.25, 0), x_dir=(1, 0, 0), z_dir=(0, 1, 0))):
        with BuildLine():
            Line((2.475137585, -0.824625285), (1.25, -0.787687443))
            Line((1.25, -0.787687443), (1.25, -1.75))
            Line((1.25, -1.75), (0.75, -1.75))
            Line((0.75, -1.75), (0.75, 1.75))
            Line((0.75, 1.75), (1.25, 1.75))
            Line((1.25, 1.75), (1.25, 0.787687443))
            Line((1.25, 0.787687443), (2.475137585, 0.824625285))
            ThreePointArc((2.475137585, 0.824625285), (3.325, 0), (2.475137585, -0.824625285))
        make_face()
        with Locations(Location((2.5, 0, 0), (0, 0, 270))):
            Circle(SKETCH32_R, mode=Mode.SUBTRACT)
    extrude(amount=SHUTTLESLIDERFORTHREADING_DEPTH)

    # Sketch33 → ShuttleBody (add)
    with BuildSketch(Plane.ZY.offset(-0.75)):
        with Locations((0, -9.5)):
            Rectangle(SKETCH33_W, SKETCH33_H)
    extrude(amount=-SHUTTLEBODY_DEPTH)

    # Sketch34 → AlignmentRidge (add)
    with BuildSketch(Plane.ZY.offset(-0.75)):
        with Locations((-1.55, -9.5)):
            Rectangle(SKETCH34_W, SKETCH34_H)
    extrude(amount=ALIGNMENTRIDGE_DEPTH)

    # Sketch50 → Cut-Extrude7 (cut)
    with BuildSketch(Plane.XZ.offset(10.25)):
        with Locations(Location((2.5, 0, 0), (0, 0, 270))):
            Circle(SKETCH50_R)
    extrude(amount=-CUT_EXTRUDE7_DEPTH, mode=Mode.SUBTRACT)


solid = Compound([body_3.part, part_1.part, body_2_1.part, body_4.part])
